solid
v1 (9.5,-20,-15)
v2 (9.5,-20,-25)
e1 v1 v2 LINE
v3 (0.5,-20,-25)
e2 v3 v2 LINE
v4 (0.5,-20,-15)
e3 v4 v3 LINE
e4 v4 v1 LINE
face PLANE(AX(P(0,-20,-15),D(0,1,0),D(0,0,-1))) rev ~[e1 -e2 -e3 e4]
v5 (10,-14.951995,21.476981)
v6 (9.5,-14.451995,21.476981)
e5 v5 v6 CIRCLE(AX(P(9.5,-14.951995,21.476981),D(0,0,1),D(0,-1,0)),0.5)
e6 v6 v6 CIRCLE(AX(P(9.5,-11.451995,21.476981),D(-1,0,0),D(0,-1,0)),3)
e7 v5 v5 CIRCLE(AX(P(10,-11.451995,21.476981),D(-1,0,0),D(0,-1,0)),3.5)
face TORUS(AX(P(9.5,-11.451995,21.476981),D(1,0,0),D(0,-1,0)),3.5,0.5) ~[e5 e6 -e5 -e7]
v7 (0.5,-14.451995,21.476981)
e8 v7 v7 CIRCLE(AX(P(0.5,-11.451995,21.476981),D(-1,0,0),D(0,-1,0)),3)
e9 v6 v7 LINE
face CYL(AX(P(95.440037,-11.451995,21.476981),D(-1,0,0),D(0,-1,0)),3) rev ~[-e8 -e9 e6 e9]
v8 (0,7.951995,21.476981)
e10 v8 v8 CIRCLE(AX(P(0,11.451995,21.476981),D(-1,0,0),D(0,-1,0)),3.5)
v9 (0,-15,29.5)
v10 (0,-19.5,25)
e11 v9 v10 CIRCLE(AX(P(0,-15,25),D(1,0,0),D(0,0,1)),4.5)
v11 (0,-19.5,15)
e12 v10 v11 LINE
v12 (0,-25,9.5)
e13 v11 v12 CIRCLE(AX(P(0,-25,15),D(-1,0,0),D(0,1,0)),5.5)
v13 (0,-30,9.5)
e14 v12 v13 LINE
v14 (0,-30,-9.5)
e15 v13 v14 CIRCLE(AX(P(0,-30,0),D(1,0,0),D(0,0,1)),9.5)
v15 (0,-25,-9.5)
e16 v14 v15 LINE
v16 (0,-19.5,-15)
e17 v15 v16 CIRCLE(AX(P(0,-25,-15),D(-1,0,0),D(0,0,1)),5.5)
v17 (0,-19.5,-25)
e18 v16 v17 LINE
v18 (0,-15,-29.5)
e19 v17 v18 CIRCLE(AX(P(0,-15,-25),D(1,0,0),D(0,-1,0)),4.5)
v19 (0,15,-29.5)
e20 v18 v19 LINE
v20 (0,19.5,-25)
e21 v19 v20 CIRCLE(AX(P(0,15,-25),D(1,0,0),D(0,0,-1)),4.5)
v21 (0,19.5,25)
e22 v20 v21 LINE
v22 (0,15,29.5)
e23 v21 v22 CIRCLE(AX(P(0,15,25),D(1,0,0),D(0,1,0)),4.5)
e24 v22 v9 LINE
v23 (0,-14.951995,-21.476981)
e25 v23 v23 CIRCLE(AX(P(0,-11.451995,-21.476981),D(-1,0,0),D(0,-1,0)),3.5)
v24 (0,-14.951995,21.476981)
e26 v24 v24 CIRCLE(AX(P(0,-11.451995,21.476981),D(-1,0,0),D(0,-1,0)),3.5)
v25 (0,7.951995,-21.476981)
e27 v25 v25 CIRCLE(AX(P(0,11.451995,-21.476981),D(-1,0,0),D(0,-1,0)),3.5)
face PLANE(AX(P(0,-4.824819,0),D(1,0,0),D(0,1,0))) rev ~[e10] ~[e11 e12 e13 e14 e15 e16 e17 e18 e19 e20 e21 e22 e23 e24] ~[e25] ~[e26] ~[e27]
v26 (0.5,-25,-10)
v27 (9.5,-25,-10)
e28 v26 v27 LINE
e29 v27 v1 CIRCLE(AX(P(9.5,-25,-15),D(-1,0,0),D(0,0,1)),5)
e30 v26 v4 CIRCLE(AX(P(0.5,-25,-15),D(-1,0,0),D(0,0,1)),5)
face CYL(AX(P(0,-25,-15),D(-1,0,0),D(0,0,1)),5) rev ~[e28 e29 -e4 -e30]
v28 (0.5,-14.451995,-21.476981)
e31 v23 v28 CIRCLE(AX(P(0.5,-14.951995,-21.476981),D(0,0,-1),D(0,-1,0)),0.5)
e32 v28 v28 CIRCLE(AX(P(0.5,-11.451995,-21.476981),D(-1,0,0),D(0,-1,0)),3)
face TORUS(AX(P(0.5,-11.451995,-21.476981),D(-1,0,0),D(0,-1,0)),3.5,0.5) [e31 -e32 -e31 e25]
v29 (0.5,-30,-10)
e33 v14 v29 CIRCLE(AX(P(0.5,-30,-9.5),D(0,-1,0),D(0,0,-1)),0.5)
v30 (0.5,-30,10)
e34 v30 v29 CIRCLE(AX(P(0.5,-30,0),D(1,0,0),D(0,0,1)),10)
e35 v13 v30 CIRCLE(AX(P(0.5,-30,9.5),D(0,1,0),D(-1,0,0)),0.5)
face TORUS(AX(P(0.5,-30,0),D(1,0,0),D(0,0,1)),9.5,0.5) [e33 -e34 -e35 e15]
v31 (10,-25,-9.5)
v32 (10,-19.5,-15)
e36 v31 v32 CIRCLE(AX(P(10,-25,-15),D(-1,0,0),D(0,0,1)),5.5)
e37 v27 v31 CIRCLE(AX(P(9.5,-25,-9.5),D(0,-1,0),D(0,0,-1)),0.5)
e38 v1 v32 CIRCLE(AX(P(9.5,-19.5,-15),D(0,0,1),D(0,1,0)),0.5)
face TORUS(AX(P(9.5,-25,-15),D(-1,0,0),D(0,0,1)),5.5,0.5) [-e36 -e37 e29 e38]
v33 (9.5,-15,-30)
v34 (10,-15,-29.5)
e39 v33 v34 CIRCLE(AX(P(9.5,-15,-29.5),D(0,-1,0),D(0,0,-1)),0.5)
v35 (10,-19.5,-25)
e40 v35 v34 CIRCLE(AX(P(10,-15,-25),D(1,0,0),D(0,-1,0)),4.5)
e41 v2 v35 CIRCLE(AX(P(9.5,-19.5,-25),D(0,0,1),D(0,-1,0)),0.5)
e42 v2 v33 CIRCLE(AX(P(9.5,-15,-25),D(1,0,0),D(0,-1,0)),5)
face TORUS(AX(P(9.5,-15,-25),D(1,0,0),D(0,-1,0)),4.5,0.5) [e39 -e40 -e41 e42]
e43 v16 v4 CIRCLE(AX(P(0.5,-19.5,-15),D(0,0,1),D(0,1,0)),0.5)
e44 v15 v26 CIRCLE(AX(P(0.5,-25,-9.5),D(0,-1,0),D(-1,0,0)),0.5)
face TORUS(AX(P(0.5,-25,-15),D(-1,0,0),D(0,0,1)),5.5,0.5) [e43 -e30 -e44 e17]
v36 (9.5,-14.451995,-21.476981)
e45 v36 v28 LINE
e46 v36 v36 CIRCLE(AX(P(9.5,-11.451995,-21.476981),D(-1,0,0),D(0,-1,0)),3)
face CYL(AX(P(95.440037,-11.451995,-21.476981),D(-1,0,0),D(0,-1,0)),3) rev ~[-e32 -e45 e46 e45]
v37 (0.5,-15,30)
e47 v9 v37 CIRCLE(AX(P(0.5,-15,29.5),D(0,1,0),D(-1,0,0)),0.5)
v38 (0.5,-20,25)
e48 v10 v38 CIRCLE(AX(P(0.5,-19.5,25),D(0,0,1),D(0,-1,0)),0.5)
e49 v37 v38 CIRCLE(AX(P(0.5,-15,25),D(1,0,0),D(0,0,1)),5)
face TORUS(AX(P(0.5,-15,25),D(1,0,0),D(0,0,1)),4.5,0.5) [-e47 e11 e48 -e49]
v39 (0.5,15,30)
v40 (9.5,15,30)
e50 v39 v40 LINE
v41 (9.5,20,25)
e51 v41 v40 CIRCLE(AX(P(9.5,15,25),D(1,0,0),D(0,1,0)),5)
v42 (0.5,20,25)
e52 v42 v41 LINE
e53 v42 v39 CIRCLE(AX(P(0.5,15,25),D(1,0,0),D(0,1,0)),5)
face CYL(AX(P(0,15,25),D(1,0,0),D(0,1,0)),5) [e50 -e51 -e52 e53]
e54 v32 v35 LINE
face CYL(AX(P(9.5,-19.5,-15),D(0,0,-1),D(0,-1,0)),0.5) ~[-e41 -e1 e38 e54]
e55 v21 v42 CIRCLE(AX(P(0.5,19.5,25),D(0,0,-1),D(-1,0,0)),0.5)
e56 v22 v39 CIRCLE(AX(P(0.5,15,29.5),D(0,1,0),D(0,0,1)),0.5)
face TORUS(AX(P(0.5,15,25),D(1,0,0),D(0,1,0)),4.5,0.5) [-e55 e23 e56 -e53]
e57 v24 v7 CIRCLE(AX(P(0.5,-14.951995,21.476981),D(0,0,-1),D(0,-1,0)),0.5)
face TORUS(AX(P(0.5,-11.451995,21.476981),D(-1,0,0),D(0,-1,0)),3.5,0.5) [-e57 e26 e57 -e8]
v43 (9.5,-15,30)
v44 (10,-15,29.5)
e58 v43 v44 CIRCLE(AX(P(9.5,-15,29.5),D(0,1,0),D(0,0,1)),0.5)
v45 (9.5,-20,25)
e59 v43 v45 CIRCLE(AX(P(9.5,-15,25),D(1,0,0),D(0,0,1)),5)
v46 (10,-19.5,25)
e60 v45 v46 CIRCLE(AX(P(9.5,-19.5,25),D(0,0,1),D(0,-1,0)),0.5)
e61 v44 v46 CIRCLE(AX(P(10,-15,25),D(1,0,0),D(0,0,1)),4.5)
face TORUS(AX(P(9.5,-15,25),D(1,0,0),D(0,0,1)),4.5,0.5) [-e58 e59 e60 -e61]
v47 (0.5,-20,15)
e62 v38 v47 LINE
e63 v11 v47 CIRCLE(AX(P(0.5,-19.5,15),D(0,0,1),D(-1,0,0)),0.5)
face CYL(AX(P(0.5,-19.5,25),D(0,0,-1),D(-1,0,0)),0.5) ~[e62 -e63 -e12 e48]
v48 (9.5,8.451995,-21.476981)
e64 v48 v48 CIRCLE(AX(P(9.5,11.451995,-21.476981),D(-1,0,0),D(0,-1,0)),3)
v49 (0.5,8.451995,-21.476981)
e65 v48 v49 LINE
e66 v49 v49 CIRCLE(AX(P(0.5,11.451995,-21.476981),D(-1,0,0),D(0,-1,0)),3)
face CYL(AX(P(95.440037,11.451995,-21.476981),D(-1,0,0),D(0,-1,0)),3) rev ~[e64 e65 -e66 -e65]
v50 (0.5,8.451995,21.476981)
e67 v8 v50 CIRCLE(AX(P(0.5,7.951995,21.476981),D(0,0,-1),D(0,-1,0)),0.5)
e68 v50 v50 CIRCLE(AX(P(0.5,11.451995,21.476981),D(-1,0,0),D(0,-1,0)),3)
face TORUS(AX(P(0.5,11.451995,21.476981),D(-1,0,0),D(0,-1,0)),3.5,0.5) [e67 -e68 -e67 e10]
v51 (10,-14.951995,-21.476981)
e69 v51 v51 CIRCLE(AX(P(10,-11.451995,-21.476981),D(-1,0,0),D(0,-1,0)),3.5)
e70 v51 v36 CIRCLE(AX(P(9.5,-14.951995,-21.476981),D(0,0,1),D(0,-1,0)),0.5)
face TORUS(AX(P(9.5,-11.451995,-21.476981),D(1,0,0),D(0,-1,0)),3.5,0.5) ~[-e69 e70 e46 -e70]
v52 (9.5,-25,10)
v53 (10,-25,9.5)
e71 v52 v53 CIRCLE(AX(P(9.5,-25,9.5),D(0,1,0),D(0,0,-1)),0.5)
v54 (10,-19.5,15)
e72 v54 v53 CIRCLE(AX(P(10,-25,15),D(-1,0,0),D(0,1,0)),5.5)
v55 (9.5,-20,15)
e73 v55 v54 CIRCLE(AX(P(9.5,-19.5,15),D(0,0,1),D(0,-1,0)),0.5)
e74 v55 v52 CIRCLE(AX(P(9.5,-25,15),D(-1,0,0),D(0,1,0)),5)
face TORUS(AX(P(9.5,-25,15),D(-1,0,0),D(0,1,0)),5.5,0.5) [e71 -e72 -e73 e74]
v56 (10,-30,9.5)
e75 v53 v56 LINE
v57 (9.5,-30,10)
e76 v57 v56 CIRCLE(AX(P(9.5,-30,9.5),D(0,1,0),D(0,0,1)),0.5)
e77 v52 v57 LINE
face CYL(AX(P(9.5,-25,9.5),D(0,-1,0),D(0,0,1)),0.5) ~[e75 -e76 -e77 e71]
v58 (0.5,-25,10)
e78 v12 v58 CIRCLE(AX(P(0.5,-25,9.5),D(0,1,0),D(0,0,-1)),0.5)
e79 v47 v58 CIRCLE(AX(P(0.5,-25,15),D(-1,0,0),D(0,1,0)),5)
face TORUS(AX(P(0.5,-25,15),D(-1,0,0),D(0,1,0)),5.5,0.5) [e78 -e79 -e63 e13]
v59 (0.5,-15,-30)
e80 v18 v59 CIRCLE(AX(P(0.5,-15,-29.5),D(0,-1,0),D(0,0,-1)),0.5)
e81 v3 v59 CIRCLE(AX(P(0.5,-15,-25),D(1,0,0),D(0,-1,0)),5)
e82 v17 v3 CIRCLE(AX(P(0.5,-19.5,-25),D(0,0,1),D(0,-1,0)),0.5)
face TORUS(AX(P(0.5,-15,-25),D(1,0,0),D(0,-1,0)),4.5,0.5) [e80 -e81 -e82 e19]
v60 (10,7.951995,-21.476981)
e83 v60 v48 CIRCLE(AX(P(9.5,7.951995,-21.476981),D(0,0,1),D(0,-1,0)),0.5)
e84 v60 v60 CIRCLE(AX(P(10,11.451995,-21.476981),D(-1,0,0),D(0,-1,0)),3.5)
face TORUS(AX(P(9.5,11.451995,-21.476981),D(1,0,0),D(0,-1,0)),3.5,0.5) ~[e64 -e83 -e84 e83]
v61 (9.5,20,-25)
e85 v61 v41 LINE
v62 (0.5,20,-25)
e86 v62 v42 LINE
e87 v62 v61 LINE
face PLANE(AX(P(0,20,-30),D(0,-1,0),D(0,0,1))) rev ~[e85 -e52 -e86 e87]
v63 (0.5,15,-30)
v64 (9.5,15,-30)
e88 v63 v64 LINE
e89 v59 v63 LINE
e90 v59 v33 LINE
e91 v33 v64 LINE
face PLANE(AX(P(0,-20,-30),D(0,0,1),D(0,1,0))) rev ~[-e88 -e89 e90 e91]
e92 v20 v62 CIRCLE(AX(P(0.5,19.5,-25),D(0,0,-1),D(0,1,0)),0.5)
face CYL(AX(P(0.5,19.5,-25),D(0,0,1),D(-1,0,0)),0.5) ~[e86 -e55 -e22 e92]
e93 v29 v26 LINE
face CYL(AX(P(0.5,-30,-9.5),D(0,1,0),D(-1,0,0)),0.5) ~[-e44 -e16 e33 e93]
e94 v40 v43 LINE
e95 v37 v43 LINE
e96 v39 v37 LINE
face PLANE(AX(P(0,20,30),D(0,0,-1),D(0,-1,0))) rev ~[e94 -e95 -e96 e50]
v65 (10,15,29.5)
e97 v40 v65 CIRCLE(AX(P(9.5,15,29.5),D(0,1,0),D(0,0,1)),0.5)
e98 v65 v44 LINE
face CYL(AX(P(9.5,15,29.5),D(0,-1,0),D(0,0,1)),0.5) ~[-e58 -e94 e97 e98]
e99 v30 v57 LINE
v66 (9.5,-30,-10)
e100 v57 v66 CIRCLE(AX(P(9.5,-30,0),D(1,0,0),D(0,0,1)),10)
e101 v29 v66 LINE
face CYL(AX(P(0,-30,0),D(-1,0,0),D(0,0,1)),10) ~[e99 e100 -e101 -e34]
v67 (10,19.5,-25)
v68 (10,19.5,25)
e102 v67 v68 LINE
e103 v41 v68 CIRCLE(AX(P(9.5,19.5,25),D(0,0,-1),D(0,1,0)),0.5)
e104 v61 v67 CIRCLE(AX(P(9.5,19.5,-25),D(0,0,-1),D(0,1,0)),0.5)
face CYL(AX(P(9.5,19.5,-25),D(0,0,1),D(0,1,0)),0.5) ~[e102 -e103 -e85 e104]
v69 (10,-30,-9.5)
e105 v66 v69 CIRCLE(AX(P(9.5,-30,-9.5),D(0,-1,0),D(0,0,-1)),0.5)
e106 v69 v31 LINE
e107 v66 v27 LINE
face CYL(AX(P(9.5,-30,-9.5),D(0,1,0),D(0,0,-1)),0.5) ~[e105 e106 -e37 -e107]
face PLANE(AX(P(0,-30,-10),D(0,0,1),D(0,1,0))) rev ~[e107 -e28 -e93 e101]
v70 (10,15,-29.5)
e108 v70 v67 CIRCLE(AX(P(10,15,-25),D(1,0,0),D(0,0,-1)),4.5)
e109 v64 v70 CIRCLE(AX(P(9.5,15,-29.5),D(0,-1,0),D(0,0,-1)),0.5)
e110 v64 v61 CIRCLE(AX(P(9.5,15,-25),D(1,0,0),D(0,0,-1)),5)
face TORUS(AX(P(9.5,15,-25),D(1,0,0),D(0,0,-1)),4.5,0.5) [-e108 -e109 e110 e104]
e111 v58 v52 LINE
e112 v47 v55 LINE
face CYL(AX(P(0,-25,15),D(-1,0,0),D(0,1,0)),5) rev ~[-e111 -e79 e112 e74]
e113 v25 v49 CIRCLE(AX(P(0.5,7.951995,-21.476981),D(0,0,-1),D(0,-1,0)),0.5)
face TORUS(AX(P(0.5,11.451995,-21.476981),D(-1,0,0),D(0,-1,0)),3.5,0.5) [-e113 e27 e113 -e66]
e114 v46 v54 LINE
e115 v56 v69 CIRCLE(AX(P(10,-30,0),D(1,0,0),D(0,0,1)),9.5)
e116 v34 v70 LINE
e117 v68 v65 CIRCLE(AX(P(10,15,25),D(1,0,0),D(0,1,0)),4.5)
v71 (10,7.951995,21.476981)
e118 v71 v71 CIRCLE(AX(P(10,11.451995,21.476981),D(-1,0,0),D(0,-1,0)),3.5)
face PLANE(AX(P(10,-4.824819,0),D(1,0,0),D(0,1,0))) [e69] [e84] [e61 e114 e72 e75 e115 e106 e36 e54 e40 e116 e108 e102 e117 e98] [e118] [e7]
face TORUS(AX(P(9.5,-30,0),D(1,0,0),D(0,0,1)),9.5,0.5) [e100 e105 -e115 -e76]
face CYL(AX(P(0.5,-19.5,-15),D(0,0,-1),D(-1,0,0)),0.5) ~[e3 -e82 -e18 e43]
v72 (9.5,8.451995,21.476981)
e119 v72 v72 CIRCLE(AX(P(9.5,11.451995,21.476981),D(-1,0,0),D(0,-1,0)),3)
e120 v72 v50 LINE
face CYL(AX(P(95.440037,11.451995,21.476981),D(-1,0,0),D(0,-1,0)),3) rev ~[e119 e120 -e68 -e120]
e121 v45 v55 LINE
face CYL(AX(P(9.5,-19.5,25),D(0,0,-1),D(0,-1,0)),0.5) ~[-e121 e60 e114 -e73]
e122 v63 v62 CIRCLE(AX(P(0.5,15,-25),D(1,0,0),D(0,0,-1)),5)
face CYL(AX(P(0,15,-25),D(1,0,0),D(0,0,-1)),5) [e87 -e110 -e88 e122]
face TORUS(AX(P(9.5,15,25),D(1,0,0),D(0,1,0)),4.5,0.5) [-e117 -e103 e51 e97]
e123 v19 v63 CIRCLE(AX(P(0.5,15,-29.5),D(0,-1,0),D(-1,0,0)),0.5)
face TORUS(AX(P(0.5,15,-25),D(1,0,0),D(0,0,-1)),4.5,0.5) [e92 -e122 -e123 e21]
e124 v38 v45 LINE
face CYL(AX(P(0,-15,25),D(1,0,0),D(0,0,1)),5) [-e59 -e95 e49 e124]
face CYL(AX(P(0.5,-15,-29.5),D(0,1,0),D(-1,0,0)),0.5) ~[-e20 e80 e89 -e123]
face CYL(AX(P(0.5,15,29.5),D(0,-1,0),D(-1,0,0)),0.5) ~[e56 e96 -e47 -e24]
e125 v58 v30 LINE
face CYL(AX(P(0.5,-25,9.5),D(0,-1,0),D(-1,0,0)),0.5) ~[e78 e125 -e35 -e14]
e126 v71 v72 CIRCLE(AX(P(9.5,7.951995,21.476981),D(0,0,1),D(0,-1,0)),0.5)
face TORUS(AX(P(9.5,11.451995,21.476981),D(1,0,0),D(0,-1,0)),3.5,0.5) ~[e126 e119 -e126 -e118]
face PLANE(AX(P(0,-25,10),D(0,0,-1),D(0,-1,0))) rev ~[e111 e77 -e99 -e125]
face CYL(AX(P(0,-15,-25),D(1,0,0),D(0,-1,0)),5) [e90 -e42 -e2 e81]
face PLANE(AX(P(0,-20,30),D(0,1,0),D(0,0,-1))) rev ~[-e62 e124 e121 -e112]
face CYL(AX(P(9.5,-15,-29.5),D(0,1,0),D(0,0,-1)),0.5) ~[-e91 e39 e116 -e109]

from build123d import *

# Parameters (mm, degrees)
F1_DEPTH = 10
F2_R     = 5
F5_D     = 6
F6_R     = 0.5


with BuildPart() as f1:
    # F0 (on Right) → F1 (new body)
    with BuildSketch(Plane.YZ):
        with BuildLine():
            Line((-20, -15), (-20, -30))
            Line((-20, -30), (20, -30))
            Line((20, -30), (20, 30))
            Line((20, 30), (-20, 30))
            Line((-20, 30), (-20, 15))
            ThreePointArc((-20, 15), (-21.4644660941, 11.4644660941), (-25, 10))
            Line((-25, 10), (-30, 10))
            ThreePointArc((-30, 10), (-40, 0), (-30, -10))
            Line((-30, -10), (-25, -10))
            ThreePointArc((-25, -10), (-21.4644660941, -11.4644660941), (-20, -15))
        make_face()
    extrude(amount=F1_DEPTH)

    # F2
    f2_edges = [f1.edges().sort_by_distance(p)[0] for p in [
        (5, -20, 30),
        (5, 20, 30),
        (5, 20, -30),
        (5, -20, -30),
    ]]
    fillet(f2_edges, radius=F2_R)

    # F5 (through all)
    with Locations(Plane.YZ.offset(10)):
        with Locations((-11.4519952962, 21.4769810358), (11.4519952962, 21.4769810358), (11.4519952962, -21.4769810358), (-11.4519952962, -21.4769810358)):
            Hole(F5_D / 2)

    # F6
    f6_edges = [f1.edges().sort_by_distance(p)[0] for p in [
        (0, -18.535534, -28.535534),
        (5, -20, -25),
        (5, -15, -30),
        (10, -18.535534, -28.535534),
        (0, -18.535534, 28.535534),
        (5, -15, 30),
        (5, -20, 25),
        (10, -18.535534, 28.535534),
        (10, 18.535534, -28.535534),
        (0, 18.535534, 28.535534),
        (5, 20, 25),
        (5, 15, 30),
        (10, 18.535534, 28.535534),
        (5, -30, 10),
        (5, -30, -10),
        (0, -40, 0),
        (10, -40, 0),
        (5, -25, 10),
        (0, -27.5, 10),
        (10, -27.5, 10),
        (0, 0, -30),
        (5, 15, -30),
        (10, 0, -30),
        (0, 0, 30),
        (10, 0, 30),
        (5, -25, -10),
        (0, -27.5, -10),
        (10, -27.5, -10),
        (5, -20, -15),
        (0, -21.464466, -11.464466),
        (10, -21.464466, -11.464466),
        (0, 18.535534, -28.535534),
        (5, 20, -25),
        (0, -20, -20),
        (10, -20, -20),
        (0, 20, 0),
        (10, 20, 0),
        (0, -20, 20),
        (5, -20, 15),
        (10, -20, 20),
        (10, -21.464466, 11.464466),
        (10, -14.451995, -21.476981),
        (10, 8.451995, -21.476981),
        (10, -14.451995, 21.476981),
        (10, 8.451995, 21.476981),
        (0, -21.464466, 11.464466),
        (0, -14.451995, -21.476981),
        (0, 8.451995, -21.476981),
        (0, -14.451995, 21.476981),
        (0, 8.451995, 21.476981),
    ]]
    fillet(f6_edges, radius=F6_R)


solid = f1.part
